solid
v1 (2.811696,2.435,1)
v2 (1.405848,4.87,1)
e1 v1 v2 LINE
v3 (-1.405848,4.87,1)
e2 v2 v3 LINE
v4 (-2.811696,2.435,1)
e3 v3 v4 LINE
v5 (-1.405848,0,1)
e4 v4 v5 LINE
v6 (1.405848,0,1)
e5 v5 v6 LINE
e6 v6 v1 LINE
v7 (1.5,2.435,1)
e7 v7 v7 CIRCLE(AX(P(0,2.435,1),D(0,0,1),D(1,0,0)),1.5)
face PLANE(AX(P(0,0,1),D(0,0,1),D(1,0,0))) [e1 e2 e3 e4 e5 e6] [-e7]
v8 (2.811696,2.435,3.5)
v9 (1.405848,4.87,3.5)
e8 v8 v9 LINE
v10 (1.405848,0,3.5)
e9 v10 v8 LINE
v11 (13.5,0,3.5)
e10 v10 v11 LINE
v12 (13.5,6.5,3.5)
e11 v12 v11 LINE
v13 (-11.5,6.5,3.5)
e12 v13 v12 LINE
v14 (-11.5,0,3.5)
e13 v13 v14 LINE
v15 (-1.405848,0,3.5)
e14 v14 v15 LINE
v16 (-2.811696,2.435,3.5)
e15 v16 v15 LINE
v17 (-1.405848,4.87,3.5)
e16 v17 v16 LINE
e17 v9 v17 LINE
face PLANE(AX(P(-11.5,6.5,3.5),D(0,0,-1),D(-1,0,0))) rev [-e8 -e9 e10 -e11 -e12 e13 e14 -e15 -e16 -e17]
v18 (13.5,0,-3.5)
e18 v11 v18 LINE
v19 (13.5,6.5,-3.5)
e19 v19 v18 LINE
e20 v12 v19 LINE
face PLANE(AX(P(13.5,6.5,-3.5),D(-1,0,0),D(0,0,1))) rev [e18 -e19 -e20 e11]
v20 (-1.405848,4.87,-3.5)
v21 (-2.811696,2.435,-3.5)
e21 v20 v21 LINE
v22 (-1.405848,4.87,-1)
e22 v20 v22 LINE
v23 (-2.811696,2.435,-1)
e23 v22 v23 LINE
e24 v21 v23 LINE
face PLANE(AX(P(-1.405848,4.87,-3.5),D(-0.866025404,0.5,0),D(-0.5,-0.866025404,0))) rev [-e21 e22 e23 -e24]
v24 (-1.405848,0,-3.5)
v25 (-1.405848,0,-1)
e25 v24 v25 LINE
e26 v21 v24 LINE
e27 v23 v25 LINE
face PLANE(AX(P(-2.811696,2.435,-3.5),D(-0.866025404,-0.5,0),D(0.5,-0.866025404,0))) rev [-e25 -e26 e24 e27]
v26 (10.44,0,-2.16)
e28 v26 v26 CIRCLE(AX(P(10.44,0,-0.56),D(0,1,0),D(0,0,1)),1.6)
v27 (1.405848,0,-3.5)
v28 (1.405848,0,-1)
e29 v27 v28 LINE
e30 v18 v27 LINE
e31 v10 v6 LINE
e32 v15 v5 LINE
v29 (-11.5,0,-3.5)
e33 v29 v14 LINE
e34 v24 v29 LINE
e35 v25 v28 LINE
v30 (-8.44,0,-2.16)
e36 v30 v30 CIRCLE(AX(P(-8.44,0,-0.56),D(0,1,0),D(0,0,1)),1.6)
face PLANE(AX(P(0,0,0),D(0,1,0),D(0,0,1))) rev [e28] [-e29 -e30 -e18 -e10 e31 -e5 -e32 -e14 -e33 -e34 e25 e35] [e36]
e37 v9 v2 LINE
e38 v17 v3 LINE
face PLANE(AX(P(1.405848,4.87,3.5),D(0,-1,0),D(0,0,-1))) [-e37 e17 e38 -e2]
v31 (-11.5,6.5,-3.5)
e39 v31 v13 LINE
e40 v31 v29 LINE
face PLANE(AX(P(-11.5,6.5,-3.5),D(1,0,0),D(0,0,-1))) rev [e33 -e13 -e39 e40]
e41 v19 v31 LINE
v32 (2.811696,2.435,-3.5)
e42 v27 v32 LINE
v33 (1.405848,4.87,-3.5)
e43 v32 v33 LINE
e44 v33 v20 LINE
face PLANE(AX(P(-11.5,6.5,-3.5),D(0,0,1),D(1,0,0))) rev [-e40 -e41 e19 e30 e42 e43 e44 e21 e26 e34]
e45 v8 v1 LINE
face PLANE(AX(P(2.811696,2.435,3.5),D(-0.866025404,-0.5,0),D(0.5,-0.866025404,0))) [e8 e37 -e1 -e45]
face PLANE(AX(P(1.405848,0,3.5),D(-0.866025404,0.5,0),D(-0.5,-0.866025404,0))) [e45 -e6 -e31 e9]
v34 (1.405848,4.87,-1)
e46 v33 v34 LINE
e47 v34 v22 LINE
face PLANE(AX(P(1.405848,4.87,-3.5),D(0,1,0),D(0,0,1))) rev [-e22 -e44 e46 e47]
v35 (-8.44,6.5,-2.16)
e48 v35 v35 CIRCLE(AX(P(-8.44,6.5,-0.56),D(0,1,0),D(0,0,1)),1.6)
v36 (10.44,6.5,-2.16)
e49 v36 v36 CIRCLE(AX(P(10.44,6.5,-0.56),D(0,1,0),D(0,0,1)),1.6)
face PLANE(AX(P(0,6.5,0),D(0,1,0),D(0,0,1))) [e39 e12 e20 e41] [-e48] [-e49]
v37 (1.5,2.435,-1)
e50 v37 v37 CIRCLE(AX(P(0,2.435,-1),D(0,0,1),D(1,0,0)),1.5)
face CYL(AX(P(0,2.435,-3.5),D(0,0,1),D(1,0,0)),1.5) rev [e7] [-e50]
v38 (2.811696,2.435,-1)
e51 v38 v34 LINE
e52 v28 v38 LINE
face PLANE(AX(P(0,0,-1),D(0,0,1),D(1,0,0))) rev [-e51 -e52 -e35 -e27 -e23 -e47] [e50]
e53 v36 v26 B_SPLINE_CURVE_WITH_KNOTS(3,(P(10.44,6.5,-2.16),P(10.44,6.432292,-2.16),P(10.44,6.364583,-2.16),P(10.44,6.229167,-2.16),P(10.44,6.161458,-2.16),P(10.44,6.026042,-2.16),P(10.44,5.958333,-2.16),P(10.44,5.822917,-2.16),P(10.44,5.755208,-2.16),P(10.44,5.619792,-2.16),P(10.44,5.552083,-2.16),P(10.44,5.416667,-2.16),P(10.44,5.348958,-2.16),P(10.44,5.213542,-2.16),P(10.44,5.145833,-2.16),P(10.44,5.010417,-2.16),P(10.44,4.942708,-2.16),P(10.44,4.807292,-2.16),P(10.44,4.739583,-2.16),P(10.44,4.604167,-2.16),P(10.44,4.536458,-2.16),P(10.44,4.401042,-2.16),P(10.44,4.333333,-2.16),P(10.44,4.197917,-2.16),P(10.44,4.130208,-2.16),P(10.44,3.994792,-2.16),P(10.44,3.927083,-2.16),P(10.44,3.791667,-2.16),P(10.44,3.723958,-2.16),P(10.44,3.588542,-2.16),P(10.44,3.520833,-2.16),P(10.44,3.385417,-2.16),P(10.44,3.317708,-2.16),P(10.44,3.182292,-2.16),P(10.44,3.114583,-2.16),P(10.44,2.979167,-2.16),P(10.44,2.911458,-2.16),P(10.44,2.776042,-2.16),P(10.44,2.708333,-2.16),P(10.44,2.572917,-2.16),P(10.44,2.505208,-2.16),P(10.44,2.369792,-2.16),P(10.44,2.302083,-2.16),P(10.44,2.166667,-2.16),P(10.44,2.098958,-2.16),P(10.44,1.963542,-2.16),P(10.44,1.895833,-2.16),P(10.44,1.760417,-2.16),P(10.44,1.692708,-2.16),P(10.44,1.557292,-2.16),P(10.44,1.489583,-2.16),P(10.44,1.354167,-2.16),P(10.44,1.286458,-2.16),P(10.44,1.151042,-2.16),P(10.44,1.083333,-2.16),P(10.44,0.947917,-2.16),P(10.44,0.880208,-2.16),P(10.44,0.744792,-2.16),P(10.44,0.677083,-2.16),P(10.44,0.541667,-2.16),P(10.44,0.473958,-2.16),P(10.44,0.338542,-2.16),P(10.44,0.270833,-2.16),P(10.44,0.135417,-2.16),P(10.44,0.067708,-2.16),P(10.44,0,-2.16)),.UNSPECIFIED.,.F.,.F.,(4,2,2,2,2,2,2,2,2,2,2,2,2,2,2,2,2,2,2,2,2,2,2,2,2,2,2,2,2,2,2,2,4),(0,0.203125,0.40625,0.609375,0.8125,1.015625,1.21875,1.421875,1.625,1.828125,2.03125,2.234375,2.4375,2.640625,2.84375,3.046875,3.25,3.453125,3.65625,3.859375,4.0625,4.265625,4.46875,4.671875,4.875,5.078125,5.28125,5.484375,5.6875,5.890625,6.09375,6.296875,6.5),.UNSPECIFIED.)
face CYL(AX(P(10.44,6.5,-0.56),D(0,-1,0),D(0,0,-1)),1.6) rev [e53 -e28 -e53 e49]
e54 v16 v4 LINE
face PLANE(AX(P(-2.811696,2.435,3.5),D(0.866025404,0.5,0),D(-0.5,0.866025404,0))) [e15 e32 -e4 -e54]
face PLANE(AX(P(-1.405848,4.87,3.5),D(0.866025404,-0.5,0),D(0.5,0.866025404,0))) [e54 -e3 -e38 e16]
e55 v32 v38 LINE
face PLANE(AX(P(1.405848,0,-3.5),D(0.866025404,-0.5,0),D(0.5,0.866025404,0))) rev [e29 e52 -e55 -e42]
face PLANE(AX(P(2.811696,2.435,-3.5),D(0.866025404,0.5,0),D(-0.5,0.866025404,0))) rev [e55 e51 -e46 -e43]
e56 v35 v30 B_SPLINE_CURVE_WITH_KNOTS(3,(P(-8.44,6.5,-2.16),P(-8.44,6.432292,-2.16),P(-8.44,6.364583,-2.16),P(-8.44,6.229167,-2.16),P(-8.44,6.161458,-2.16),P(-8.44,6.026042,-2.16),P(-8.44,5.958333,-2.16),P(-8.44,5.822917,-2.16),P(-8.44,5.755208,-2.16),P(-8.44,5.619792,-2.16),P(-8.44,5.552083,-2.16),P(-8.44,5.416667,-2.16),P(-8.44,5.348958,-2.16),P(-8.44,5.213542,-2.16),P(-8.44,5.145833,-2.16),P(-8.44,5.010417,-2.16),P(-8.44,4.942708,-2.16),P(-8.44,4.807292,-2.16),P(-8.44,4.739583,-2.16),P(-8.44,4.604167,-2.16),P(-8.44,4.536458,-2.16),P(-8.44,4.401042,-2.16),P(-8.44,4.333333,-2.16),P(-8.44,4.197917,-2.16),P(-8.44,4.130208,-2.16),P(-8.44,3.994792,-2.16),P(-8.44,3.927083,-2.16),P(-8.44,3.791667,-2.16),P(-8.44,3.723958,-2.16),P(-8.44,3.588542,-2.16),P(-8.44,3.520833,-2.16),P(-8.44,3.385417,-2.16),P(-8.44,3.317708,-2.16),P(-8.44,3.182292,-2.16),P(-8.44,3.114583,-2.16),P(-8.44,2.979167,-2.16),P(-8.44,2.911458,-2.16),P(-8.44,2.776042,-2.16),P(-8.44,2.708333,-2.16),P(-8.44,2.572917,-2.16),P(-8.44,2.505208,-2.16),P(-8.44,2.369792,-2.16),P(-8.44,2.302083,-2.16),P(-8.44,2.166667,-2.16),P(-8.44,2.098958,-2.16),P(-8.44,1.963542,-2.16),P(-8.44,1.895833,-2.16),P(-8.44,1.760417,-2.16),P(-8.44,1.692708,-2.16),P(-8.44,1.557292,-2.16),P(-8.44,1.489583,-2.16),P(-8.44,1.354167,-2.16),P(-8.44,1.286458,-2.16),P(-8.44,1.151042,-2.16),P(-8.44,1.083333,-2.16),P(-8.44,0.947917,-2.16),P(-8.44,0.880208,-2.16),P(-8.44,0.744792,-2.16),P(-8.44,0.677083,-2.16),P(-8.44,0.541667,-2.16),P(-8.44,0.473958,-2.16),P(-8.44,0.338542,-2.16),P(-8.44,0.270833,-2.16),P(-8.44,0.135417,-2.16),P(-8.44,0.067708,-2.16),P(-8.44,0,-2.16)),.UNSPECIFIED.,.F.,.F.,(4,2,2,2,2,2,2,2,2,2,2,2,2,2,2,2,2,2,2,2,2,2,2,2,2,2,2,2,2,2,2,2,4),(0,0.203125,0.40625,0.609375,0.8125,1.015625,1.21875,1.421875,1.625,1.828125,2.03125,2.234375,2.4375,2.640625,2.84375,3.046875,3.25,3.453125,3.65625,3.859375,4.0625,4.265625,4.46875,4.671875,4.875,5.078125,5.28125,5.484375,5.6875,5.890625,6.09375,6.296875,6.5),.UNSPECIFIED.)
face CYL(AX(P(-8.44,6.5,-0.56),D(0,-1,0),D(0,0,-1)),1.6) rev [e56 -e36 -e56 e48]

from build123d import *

# Parameters (mm, degrees)
SKETCH1_W               = 25
SKETCH1_H               = 7
SKETCH1_R               = 1.6
BOSS_EXTRUDE1_DEPTH     = 6.5
CUT_EXTRUDE1_START      = -1
SKETCH3_R               = 1.5
CUT_EXTRUDE1_DEPTH      = 15.386682553
CUT_EXTRUDE2_START      = 1
CUT_EXTRUDE2_OUTLINE_R  = 1.5
CUT_EXTRUDE2_DEPTH      = 2.5
CUT_EXTRUDE3_DEPTH      = 16.386682553
CUT_EXTRUDE3_DEPTH_BACK = 16.386682553
SKETCH3_3_R             = 1.5


# Read off the part's stored shape, not the designer's step: Cut-Extrude2
with BuildPart() as part:
    # Sketch1 → Boss-Extrude1 (new body)
    with BuildSketch(Plane(origin=(0, 0, 0), x_dir=(1, 0, 0), z_dir=(0, 1, 0))):
        with Locations((1, 0)):
            Rectangle(SKETCH1_W, SKETCH1_H)
        with Locations(Location((10.44, 0.56, 0), (0, 0, 90))):
            Circle(SKETCH1_R, mode=Mode.SUBTRACT)
        with Locations(Location((-8.44, 0.56, 0), (0, 0, 90))):
            Circle(SKETCH1_R, mode=Mode.SUBTRACT)
    extrude(amount=BOSS_EXTRUDE1_DEPTH)

    # Sketch3 → Cut-Extrude1 (cut, through all)
    with BuildSketch(Plane.XY.offset(CUT_EXTRUDE1_START)):
        Polygon((1.405847905, 0), (2.811695811, 2.435), (1.405847905, 4.87), (-1.405847905, 4.87), (-2.811695811, 2.435), (-1.405847905, 0), align=None)
        with Locations((0, 2.435)):
            Circle(SKETCH3_R, mode=Mode.SUBTRACT)
    extrude(amount=-CUT_EXTRUDE1_DEPTH, mode=Mode.SUBTRACT)

    # Cut-Extrude2 outline → Cut-Extrude2 (cut)
    with BuildSketch(Plane.XY.offset(CUT_EXTRUDE2_START)):
        Polygon((-2.811695811, 2.435), (-1.405847905, 0), (1.405847905, 0), (2.811695811, 2.435), (1.405847905, 4.87), (-1.405847905, 4.87), align=None)
        with Locations((0, 2.435)):
            Circle(CUT_EXTRUDE2_OUTLINE_R, mode=Mode.SUBTRACT)
    extrude(amount=CUT_EXTRUDE2_DEPTH, mode=Mode.SUBTRACT)

    # Sketch3<3> → Cut-Extrude3 (cut, two sides: drawn at the far end of the back side and taken through both)
    with BuildSketch(Plane.XY.offset(-CUT_EXTRUDE3_DEPTH_BACK)):
        with Locations((0, 2.435)):
            Circle(SKETCH3_3_R)
    extrude(amount=CUT_EXTRUDE3_DEPTH + CUT_EXTRUDE3_DEPTH_BACK, mode=Mode.SUBTRACT)


solid = part.part
